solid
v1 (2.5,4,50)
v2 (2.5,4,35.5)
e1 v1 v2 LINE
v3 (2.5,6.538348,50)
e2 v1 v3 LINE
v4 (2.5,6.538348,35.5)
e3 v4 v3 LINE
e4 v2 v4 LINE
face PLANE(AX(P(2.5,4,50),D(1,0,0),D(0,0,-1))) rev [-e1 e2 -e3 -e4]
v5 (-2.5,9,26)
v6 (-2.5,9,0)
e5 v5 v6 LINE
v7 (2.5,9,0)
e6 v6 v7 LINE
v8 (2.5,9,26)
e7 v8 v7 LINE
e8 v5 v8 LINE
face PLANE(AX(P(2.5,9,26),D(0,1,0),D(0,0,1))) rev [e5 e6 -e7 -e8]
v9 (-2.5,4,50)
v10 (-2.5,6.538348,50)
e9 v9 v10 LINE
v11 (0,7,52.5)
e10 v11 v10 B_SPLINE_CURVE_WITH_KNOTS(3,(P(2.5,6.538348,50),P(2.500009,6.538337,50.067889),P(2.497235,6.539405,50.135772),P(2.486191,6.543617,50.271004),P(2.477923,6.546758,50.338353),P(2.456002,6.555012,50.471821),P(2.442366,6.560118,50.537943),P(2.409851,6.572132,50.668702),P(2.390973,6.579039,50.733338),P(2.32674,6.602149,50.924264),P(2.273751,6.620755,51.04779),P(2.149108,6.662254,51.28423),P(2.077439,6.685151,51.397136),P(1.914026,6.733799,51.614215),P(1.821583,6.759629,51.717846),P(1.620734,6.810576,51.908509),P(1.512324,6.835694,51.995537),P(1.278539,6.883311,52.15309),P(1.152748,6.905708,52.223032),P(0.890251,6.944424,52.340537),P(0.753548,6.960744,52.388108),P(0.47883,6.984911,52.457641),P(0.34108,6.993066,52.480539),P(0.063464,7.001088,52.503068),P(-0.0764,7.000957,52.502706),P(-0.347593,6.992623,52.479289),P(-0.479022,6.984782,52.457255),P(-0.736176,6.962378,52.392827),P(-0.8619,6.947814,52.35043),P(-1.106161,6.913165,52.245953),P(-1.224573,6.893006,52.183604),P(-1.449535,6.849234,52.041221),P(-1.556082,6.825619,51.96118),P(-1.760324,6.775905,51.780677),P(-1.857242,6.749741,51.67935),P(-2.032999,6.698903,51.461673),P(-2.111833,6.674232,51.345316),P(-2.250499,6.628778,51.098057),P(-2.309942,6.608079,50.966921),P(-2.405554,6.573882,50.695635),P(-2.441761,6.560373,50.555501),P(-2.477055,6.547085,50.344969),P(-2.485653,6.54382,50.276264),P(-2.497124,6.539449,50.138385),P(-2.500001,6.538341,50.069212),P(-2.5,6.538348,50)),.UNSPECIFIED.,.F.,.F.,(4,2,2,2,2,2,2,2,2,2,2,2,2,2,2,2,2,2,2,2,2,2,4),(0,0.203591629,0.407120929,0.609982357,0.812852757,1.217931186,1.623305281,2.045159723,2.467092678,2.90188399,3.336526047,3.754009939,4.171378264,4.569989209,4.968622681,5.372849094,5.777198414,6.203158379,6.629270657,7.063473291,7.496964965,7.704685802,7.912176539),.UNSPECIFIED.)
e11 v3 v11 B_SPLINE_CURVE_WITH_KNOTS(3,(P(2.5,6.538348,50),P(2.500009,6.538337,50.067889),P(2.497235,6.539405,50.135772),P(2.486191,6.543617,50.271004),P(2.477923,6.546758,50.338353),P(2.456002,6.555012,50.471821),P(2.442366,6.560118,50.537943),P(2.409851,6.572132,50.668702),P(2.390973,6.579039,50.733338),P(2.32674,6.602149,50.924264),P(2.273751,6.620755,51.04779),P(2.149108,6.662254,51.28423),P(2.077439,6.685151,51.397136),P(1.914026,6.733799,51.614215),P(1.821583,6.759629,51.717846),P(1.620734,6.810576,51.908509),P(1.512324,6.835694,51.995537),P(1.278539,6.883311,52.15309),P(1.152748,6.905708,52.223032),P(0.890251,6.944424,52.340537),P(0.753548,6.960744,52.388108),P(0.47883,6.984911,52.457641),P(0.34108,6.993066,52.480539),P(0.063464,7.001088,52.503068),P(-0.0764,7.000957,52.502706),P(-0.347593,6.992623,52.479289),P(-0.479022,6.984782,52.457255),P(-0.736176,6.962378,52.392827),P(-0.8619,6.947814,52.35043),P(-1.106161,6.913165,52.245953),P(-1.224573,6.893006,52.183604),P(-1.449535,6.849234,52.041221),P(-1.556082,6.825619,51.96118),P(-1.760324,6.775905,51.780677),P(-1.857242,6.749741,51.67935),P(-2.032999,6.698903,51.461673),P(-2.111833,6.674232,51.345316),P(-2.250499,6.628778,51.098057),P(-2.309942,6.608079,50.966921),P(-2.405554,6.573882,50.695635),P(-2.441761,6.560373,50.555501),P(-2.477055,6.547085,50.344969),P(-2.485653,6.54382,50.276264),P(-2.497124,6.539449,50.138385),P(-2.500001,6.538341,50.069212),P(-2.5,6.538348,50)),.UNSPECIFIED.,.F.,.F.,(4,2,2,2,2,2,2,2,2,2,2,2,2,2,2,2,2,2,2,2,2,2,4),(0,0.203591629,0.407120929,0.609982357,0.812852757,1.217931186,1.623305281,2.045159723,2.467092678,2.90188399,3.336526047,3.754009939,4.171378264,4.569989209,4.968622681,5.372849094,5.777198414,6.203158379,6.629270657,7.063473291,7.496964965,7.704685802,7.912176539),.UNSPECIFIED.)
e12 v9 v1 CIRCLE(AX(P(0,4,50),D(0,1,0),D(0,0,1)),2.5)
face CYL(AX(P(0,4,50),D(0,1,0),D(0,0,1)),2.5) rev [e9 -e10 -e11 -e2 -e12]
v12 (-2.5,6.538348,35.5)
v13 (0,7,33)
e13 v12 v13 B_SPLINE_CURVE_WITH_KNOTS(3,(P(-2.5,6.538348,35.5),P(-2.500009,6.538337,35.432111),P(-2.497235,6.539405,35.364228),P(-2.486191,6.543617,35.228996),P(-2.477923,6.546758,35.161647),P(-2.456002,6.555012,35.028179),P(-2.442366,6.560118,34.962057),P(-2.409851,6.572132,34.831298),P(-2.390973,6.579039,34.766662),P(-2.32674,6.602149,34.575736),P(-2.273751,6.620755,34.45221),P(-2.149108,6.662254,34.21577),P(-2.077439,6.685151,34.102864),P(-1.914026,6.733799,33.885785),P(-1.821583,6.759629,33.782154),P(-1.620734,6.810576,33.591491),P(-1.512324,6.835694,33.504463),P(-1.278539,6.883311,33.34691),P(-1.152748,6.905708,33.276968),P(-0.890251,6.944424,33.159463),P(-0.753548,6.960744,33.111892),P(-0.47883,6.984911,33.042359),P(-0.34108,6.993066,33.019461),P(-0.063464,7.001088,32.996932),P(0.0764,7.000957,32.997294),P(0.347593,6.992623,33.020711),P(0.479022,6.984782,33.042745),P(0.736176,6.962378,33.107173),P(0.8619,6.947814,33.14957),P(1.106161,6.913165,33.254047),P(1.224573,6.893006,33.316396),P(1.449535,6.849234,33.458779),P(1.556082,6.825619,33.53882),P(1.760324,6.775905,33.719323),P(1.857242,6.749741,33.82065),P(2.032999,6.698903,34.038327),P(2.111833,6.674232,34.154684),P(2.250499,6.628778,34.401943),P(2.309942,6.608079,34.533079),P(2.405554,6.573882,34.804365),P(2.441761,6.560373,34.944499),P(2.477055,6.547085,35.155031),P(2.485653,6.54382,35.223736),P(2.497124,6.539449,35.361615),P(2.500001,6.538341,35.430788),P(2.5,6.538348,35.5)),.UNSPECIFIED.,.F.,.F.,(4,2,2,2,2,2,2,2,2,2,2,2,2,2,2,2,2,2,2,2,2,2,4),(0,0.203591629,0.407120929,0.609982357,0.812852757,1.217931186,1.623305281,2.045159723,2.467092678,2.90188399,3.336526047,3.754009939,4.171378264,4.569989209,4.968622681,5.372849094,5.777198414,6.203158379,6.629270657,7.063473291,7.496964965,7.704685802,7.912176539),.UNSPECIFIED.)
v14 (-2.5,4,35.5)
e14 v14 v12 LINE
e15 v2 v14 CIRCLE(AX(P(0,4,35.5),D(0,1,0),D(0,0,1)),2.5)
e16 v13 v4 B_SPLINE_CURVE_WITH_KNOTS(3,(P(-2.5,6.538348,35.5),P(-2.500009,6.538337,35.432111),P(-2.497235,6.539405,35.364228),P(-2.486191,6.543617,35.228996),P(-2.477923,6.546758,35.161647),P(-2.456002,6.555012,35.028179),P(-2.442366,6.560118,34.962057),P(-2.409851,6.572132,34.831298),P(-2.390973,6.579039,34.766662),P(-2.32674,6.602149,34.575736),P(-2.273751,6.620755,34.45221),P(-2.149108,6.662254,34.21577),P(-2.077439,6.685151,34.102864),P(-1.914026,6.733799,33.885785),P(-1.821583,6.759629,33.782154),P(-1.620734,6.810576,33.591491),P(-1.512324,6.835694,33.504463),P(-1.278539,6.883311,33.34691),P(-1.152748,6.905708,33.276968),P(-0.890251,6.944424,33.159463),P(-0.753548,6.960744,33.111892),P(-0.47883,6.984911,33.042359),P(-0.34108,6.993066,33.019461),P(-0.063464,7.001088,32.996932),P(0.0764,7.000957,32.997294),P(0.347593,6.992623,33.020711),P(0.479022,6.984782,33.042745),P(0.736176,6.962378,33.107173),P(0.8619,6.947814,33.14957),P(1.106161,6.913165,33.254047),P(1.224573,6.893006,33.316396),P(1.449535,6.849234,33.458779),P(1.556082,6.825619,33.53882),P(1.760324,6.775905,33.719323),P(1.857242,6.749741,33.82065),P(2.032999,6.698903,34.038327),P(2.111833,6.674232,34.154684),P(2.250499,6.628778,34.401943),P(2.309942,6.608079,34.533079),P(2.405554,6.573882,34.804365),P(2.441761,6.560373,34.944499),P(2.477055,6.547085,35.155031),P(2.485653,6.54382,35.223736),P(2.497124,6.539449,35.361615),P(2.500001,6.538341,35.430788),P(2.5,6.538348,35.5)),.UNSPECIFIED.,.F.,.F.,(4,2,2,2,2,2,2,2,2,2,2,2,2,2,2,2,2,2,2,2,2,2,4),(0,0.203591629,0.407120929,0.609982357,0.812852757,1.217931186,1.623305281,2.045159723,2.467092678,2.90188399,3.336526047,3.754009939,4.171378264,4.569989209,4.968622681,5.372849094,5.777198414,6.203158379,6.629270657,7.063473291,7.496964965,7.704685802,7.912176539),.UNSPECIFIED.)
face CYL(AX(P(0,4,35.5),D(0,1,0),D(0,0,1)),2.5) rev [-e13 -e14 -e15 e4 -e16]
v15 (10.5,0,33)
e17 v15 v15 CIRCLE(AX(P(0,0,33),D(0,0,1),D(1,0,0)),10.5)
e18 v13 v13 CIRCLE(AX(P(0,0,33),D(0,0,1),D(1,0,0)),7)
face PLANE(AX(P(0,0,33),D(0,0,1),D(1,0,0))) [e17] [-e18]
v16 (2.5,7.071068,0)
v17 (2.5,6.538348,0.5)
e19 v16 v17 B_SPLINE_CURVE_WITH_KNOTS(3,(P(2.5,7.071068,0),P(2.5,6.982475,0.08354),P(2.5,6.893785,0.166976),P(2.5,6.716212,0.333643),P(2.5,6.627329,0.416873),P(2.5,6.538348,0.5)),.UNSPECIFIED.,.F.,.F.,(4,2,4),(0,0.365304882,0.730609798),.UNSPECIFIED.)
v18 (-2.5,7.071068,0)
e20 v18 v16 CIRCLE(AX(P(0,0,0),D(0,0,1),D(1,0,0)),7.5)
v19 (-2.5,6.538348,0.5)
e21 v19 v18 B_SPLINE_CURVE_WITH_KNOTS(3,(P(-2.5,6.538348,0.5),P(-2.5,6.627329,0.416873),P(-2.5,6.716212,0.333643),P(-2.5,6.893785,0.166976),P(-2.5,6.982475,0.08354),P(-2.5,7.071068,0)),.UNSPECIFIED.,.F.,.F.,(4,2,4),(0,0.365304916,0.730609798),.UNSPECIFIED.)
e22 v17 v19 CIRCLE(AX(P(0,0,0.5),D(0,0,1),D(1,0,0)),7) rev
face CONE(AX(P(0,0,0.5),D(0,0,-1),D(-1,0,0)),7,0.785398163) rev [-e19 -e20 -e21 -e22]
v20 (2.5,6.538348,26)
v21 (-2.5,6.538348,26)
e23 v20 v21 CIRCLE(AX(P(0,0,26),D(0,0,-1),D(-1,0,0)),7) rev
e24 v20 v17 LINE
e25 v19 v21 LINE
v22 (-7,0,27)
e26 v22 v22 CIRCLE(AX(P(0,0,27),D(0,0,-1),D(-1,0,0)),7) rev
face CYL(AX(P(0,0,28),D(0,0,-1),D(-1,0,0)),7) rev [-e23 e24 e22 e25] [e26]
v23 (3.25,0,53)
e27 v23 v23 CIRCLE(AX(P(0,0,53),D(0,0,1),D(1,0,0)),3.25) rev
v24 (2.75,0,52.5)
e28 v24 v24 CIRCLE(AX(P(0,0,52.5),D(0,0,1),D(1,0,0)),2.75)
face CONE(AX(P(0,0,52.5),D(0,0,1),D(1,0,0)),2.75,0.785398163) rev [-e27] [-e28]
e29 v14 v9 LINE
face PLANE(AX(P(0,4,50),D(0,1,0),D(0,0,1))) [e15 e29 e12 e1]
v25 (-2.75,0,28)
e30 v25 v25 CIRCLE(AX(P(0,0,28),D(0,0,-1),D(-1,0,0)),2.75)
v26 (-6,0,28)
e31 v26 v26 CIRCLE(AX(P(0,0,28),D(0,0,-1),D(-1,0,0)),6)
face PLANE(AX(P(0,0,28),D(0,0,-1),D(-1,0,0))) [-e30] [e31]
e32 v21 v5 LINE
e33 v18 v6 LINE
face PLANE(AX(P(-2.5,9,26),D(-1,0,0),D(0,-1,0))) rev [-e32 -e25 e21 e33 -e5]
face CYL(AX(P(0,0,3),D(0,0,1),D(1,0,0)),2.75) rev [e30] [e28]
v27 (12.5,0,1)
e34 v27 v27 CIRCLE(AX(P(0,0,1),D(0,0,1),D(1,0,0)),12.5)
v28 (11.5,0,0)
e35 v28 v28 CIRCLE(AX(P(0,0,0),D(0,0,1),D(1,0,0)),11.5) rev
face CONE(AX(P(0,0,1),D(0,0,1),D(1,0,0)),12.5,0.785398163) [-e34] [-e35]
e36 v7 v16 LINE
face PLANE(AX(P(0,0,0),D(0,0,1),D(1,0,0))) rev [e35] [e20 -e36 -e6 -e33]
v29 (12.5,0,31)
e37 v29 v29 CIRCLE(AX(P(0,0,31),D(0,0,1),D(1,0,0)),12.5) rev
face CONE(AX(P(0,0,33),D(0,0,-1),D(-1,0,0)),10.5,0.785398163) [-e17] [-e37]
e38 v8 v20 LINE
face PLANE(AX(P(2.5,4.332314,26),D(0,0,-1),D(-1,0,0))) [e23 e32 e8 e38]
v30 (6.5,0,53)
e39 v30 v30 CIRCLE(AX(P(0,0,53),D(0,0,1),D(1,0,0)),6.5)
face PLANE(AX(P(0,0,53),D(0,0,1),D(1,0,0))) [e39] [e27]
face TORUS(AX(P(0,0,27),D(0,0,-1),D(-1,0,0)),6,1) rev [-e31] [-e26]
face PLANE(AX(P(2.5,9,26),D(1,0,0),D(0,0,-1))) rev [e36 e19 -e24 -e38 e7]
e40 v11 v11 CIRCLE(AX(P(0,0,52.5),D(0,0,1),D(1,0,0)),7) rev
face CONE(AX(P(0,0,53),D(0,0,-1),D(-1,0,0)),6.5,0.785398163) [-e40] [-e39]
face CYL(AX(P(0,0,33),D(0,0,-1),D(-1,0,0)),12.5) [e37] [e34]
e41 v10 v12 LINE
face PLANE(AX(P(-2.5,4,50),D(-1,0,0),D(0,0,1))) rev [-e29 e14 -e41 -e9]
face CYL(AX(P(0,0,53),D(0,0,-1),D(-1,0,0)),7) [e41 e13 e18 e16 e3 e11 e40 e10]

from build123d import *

# Parameters (mm, degrees)
SKETCH_1_R          = 12.5
EXTRUDE_1_DEPTH     = 33
SKETCH_4_R          = 7
EXTRUDE_2_DEPTH     = 3
SKETCH_7_R          = 7
EXTRUDE_3_DEPTH     = 20
CHAMFER_1_SIZE      = 2
CUT_EXTRUDE_4_DEPTH = 3
CHAMFER_2_SIZE      = 0.5
CHAMFER_3_SIZE      = 1
SKETCH_9_R          = 7
CUT_EXTRUDE_5_DEPTH = 28
SKETCH_10_W         = 5
SKETCH_10_H         = 4.667686035
CUT_EXTRUDE_6_DEPTH = 26
CHAMFER_4_SIZE      = 0.5
SKETCH_11_R         = 2.75
CUT_EXTRUDE_7_DEPTH = 50
CHAMFER_5_SIZE      = 0.5
FILLET_1_R          = 1


with BuildPart() as part:
    # 草图1 → 拉伸1 (new body)
    with BuildSketch(Plane.XY):
        Circle(SKETCH_1_R)
    extrude(amount=EXTRUDE_1_DEPTH)

    # 草图4 → 拉伸2 (add)
    with BuildSketch(Plane.XY.offset(33)):
        Circle(SKETCH_4_R)
    extrude(amount=-EXTRUDE_2_DEPTH)

    # 草图7 → 拉伸3 (add)
    with BuildSketch(Plane.XY.offset(33)):
        Circle(SKETCH_7_R)
    extrude(amount=EXTRUDE_3_DEPTH)

    # 倒角1
    chamfer_1_edges = [part.edges().sort_by_distance(p)[0] for p in [
        (-12.5, 0, 33),
    ]]
    chamfer(chamfer_1_edges, length=CHAMFER_1_SIZE)

    # 草图8 → 切除-拉伸4 (cut)
    with BuildSketch(Plane(origin=(0, 7, 0), x_dir=(-1, 0, 0), z_dir=(0, 1, 0))):
        with BuildLine():
            Line((-2.5, 50), (-2.5, 35.5))
            ThreePointArc((-2.5, 35.5), (0, 33), (2.5, 35.5))
            Line((2.5, 35.5), (2.5, 50))
            ThreePointArc((2.5, 50), (0, 52.5), (-2.5, 50))
        make_face()
    extrude(amount=-CUT_EXTRUDE_4_DEPTH, mode=Mode.SUBTRACT)

    # 倒角2
    chamfer_2_edges = [part.edges().sort_by_distance(p)[0] for p in [
        (-7, 0, 53),
    ]]
    chamfer(chamfer_2_edges, length=CHAMFER_2_SIZE - 0.0001)  # a hair under: the kernel refuses the full size

    # 倒角3
    chamfer_3_edges = [part.edges().sort_by_distance(p)[0] for p in [
        (-12.5, 0, 0),
    ]]
    chamfer(chamfer_3_edges, length=CHAMFER_3_SIZE)

    # 草图9 → 切除-拉伸5 (cut)
    with BuildSketch(Plane(origin=(0, 0, 0), x_dir=(-1, 0, 0), z_dir=(0, 0, -1))):
        Circle(SKETCH_9_R)
    extrude(amount=-CUT_EXTRUDE_5_DEPTH, mode=Mode.SUBTRACT)

    # 草图10 → 切除-拉伸6 (cut)
    with BuildSketch(Plane(origin=(0, 0, 0), x_dir=(-1, 0, 0), z_dir=(0, 0, -1))):
        with Locations((0, 6.666156983)):
            Rectangle(SKETCH_10_W, SKETCH_10_H)
    extrude(amount=-CUT_EXTRUDE_6_DEPTH, mode=Mode.SUBTRACT)

    # 倒角4
    chamfer_4_edges = [part.edges().sort_by_distance(p)[0] for p in [
        (3.968626967, -5.766281297, 0),
    ]]
    chamfer(chamfer_4_edges, length=CHAMFER_4_SIZE)

    # 草图11 → 切除-拉伸7 (cut)
    with BuildSketch(Plane.XY.offset(53)):
        Circle(SKETCH_11_R)
    extrude(amount=-CUT_EXTRUDE_7_DEPTH, mode=Mode.SUBTRACT)

    # 倒角5
    chamfer_5_edges = [part.edges().sort_by_distance(p)[0] for p in [
        (-2.75, 0, 53),
    ]]
    chamfer(chamfer_5_edges, length=CHAMFER_5_SIZE)

    # 圆角1
    fillet_1_edges = [part.edges().sort_by_distance(p)[0] for p in [
        (7, 0, 28),
    ]]
    fillet(fillet_1_edges, radius=FILLET_1_R)


solid = part.part
